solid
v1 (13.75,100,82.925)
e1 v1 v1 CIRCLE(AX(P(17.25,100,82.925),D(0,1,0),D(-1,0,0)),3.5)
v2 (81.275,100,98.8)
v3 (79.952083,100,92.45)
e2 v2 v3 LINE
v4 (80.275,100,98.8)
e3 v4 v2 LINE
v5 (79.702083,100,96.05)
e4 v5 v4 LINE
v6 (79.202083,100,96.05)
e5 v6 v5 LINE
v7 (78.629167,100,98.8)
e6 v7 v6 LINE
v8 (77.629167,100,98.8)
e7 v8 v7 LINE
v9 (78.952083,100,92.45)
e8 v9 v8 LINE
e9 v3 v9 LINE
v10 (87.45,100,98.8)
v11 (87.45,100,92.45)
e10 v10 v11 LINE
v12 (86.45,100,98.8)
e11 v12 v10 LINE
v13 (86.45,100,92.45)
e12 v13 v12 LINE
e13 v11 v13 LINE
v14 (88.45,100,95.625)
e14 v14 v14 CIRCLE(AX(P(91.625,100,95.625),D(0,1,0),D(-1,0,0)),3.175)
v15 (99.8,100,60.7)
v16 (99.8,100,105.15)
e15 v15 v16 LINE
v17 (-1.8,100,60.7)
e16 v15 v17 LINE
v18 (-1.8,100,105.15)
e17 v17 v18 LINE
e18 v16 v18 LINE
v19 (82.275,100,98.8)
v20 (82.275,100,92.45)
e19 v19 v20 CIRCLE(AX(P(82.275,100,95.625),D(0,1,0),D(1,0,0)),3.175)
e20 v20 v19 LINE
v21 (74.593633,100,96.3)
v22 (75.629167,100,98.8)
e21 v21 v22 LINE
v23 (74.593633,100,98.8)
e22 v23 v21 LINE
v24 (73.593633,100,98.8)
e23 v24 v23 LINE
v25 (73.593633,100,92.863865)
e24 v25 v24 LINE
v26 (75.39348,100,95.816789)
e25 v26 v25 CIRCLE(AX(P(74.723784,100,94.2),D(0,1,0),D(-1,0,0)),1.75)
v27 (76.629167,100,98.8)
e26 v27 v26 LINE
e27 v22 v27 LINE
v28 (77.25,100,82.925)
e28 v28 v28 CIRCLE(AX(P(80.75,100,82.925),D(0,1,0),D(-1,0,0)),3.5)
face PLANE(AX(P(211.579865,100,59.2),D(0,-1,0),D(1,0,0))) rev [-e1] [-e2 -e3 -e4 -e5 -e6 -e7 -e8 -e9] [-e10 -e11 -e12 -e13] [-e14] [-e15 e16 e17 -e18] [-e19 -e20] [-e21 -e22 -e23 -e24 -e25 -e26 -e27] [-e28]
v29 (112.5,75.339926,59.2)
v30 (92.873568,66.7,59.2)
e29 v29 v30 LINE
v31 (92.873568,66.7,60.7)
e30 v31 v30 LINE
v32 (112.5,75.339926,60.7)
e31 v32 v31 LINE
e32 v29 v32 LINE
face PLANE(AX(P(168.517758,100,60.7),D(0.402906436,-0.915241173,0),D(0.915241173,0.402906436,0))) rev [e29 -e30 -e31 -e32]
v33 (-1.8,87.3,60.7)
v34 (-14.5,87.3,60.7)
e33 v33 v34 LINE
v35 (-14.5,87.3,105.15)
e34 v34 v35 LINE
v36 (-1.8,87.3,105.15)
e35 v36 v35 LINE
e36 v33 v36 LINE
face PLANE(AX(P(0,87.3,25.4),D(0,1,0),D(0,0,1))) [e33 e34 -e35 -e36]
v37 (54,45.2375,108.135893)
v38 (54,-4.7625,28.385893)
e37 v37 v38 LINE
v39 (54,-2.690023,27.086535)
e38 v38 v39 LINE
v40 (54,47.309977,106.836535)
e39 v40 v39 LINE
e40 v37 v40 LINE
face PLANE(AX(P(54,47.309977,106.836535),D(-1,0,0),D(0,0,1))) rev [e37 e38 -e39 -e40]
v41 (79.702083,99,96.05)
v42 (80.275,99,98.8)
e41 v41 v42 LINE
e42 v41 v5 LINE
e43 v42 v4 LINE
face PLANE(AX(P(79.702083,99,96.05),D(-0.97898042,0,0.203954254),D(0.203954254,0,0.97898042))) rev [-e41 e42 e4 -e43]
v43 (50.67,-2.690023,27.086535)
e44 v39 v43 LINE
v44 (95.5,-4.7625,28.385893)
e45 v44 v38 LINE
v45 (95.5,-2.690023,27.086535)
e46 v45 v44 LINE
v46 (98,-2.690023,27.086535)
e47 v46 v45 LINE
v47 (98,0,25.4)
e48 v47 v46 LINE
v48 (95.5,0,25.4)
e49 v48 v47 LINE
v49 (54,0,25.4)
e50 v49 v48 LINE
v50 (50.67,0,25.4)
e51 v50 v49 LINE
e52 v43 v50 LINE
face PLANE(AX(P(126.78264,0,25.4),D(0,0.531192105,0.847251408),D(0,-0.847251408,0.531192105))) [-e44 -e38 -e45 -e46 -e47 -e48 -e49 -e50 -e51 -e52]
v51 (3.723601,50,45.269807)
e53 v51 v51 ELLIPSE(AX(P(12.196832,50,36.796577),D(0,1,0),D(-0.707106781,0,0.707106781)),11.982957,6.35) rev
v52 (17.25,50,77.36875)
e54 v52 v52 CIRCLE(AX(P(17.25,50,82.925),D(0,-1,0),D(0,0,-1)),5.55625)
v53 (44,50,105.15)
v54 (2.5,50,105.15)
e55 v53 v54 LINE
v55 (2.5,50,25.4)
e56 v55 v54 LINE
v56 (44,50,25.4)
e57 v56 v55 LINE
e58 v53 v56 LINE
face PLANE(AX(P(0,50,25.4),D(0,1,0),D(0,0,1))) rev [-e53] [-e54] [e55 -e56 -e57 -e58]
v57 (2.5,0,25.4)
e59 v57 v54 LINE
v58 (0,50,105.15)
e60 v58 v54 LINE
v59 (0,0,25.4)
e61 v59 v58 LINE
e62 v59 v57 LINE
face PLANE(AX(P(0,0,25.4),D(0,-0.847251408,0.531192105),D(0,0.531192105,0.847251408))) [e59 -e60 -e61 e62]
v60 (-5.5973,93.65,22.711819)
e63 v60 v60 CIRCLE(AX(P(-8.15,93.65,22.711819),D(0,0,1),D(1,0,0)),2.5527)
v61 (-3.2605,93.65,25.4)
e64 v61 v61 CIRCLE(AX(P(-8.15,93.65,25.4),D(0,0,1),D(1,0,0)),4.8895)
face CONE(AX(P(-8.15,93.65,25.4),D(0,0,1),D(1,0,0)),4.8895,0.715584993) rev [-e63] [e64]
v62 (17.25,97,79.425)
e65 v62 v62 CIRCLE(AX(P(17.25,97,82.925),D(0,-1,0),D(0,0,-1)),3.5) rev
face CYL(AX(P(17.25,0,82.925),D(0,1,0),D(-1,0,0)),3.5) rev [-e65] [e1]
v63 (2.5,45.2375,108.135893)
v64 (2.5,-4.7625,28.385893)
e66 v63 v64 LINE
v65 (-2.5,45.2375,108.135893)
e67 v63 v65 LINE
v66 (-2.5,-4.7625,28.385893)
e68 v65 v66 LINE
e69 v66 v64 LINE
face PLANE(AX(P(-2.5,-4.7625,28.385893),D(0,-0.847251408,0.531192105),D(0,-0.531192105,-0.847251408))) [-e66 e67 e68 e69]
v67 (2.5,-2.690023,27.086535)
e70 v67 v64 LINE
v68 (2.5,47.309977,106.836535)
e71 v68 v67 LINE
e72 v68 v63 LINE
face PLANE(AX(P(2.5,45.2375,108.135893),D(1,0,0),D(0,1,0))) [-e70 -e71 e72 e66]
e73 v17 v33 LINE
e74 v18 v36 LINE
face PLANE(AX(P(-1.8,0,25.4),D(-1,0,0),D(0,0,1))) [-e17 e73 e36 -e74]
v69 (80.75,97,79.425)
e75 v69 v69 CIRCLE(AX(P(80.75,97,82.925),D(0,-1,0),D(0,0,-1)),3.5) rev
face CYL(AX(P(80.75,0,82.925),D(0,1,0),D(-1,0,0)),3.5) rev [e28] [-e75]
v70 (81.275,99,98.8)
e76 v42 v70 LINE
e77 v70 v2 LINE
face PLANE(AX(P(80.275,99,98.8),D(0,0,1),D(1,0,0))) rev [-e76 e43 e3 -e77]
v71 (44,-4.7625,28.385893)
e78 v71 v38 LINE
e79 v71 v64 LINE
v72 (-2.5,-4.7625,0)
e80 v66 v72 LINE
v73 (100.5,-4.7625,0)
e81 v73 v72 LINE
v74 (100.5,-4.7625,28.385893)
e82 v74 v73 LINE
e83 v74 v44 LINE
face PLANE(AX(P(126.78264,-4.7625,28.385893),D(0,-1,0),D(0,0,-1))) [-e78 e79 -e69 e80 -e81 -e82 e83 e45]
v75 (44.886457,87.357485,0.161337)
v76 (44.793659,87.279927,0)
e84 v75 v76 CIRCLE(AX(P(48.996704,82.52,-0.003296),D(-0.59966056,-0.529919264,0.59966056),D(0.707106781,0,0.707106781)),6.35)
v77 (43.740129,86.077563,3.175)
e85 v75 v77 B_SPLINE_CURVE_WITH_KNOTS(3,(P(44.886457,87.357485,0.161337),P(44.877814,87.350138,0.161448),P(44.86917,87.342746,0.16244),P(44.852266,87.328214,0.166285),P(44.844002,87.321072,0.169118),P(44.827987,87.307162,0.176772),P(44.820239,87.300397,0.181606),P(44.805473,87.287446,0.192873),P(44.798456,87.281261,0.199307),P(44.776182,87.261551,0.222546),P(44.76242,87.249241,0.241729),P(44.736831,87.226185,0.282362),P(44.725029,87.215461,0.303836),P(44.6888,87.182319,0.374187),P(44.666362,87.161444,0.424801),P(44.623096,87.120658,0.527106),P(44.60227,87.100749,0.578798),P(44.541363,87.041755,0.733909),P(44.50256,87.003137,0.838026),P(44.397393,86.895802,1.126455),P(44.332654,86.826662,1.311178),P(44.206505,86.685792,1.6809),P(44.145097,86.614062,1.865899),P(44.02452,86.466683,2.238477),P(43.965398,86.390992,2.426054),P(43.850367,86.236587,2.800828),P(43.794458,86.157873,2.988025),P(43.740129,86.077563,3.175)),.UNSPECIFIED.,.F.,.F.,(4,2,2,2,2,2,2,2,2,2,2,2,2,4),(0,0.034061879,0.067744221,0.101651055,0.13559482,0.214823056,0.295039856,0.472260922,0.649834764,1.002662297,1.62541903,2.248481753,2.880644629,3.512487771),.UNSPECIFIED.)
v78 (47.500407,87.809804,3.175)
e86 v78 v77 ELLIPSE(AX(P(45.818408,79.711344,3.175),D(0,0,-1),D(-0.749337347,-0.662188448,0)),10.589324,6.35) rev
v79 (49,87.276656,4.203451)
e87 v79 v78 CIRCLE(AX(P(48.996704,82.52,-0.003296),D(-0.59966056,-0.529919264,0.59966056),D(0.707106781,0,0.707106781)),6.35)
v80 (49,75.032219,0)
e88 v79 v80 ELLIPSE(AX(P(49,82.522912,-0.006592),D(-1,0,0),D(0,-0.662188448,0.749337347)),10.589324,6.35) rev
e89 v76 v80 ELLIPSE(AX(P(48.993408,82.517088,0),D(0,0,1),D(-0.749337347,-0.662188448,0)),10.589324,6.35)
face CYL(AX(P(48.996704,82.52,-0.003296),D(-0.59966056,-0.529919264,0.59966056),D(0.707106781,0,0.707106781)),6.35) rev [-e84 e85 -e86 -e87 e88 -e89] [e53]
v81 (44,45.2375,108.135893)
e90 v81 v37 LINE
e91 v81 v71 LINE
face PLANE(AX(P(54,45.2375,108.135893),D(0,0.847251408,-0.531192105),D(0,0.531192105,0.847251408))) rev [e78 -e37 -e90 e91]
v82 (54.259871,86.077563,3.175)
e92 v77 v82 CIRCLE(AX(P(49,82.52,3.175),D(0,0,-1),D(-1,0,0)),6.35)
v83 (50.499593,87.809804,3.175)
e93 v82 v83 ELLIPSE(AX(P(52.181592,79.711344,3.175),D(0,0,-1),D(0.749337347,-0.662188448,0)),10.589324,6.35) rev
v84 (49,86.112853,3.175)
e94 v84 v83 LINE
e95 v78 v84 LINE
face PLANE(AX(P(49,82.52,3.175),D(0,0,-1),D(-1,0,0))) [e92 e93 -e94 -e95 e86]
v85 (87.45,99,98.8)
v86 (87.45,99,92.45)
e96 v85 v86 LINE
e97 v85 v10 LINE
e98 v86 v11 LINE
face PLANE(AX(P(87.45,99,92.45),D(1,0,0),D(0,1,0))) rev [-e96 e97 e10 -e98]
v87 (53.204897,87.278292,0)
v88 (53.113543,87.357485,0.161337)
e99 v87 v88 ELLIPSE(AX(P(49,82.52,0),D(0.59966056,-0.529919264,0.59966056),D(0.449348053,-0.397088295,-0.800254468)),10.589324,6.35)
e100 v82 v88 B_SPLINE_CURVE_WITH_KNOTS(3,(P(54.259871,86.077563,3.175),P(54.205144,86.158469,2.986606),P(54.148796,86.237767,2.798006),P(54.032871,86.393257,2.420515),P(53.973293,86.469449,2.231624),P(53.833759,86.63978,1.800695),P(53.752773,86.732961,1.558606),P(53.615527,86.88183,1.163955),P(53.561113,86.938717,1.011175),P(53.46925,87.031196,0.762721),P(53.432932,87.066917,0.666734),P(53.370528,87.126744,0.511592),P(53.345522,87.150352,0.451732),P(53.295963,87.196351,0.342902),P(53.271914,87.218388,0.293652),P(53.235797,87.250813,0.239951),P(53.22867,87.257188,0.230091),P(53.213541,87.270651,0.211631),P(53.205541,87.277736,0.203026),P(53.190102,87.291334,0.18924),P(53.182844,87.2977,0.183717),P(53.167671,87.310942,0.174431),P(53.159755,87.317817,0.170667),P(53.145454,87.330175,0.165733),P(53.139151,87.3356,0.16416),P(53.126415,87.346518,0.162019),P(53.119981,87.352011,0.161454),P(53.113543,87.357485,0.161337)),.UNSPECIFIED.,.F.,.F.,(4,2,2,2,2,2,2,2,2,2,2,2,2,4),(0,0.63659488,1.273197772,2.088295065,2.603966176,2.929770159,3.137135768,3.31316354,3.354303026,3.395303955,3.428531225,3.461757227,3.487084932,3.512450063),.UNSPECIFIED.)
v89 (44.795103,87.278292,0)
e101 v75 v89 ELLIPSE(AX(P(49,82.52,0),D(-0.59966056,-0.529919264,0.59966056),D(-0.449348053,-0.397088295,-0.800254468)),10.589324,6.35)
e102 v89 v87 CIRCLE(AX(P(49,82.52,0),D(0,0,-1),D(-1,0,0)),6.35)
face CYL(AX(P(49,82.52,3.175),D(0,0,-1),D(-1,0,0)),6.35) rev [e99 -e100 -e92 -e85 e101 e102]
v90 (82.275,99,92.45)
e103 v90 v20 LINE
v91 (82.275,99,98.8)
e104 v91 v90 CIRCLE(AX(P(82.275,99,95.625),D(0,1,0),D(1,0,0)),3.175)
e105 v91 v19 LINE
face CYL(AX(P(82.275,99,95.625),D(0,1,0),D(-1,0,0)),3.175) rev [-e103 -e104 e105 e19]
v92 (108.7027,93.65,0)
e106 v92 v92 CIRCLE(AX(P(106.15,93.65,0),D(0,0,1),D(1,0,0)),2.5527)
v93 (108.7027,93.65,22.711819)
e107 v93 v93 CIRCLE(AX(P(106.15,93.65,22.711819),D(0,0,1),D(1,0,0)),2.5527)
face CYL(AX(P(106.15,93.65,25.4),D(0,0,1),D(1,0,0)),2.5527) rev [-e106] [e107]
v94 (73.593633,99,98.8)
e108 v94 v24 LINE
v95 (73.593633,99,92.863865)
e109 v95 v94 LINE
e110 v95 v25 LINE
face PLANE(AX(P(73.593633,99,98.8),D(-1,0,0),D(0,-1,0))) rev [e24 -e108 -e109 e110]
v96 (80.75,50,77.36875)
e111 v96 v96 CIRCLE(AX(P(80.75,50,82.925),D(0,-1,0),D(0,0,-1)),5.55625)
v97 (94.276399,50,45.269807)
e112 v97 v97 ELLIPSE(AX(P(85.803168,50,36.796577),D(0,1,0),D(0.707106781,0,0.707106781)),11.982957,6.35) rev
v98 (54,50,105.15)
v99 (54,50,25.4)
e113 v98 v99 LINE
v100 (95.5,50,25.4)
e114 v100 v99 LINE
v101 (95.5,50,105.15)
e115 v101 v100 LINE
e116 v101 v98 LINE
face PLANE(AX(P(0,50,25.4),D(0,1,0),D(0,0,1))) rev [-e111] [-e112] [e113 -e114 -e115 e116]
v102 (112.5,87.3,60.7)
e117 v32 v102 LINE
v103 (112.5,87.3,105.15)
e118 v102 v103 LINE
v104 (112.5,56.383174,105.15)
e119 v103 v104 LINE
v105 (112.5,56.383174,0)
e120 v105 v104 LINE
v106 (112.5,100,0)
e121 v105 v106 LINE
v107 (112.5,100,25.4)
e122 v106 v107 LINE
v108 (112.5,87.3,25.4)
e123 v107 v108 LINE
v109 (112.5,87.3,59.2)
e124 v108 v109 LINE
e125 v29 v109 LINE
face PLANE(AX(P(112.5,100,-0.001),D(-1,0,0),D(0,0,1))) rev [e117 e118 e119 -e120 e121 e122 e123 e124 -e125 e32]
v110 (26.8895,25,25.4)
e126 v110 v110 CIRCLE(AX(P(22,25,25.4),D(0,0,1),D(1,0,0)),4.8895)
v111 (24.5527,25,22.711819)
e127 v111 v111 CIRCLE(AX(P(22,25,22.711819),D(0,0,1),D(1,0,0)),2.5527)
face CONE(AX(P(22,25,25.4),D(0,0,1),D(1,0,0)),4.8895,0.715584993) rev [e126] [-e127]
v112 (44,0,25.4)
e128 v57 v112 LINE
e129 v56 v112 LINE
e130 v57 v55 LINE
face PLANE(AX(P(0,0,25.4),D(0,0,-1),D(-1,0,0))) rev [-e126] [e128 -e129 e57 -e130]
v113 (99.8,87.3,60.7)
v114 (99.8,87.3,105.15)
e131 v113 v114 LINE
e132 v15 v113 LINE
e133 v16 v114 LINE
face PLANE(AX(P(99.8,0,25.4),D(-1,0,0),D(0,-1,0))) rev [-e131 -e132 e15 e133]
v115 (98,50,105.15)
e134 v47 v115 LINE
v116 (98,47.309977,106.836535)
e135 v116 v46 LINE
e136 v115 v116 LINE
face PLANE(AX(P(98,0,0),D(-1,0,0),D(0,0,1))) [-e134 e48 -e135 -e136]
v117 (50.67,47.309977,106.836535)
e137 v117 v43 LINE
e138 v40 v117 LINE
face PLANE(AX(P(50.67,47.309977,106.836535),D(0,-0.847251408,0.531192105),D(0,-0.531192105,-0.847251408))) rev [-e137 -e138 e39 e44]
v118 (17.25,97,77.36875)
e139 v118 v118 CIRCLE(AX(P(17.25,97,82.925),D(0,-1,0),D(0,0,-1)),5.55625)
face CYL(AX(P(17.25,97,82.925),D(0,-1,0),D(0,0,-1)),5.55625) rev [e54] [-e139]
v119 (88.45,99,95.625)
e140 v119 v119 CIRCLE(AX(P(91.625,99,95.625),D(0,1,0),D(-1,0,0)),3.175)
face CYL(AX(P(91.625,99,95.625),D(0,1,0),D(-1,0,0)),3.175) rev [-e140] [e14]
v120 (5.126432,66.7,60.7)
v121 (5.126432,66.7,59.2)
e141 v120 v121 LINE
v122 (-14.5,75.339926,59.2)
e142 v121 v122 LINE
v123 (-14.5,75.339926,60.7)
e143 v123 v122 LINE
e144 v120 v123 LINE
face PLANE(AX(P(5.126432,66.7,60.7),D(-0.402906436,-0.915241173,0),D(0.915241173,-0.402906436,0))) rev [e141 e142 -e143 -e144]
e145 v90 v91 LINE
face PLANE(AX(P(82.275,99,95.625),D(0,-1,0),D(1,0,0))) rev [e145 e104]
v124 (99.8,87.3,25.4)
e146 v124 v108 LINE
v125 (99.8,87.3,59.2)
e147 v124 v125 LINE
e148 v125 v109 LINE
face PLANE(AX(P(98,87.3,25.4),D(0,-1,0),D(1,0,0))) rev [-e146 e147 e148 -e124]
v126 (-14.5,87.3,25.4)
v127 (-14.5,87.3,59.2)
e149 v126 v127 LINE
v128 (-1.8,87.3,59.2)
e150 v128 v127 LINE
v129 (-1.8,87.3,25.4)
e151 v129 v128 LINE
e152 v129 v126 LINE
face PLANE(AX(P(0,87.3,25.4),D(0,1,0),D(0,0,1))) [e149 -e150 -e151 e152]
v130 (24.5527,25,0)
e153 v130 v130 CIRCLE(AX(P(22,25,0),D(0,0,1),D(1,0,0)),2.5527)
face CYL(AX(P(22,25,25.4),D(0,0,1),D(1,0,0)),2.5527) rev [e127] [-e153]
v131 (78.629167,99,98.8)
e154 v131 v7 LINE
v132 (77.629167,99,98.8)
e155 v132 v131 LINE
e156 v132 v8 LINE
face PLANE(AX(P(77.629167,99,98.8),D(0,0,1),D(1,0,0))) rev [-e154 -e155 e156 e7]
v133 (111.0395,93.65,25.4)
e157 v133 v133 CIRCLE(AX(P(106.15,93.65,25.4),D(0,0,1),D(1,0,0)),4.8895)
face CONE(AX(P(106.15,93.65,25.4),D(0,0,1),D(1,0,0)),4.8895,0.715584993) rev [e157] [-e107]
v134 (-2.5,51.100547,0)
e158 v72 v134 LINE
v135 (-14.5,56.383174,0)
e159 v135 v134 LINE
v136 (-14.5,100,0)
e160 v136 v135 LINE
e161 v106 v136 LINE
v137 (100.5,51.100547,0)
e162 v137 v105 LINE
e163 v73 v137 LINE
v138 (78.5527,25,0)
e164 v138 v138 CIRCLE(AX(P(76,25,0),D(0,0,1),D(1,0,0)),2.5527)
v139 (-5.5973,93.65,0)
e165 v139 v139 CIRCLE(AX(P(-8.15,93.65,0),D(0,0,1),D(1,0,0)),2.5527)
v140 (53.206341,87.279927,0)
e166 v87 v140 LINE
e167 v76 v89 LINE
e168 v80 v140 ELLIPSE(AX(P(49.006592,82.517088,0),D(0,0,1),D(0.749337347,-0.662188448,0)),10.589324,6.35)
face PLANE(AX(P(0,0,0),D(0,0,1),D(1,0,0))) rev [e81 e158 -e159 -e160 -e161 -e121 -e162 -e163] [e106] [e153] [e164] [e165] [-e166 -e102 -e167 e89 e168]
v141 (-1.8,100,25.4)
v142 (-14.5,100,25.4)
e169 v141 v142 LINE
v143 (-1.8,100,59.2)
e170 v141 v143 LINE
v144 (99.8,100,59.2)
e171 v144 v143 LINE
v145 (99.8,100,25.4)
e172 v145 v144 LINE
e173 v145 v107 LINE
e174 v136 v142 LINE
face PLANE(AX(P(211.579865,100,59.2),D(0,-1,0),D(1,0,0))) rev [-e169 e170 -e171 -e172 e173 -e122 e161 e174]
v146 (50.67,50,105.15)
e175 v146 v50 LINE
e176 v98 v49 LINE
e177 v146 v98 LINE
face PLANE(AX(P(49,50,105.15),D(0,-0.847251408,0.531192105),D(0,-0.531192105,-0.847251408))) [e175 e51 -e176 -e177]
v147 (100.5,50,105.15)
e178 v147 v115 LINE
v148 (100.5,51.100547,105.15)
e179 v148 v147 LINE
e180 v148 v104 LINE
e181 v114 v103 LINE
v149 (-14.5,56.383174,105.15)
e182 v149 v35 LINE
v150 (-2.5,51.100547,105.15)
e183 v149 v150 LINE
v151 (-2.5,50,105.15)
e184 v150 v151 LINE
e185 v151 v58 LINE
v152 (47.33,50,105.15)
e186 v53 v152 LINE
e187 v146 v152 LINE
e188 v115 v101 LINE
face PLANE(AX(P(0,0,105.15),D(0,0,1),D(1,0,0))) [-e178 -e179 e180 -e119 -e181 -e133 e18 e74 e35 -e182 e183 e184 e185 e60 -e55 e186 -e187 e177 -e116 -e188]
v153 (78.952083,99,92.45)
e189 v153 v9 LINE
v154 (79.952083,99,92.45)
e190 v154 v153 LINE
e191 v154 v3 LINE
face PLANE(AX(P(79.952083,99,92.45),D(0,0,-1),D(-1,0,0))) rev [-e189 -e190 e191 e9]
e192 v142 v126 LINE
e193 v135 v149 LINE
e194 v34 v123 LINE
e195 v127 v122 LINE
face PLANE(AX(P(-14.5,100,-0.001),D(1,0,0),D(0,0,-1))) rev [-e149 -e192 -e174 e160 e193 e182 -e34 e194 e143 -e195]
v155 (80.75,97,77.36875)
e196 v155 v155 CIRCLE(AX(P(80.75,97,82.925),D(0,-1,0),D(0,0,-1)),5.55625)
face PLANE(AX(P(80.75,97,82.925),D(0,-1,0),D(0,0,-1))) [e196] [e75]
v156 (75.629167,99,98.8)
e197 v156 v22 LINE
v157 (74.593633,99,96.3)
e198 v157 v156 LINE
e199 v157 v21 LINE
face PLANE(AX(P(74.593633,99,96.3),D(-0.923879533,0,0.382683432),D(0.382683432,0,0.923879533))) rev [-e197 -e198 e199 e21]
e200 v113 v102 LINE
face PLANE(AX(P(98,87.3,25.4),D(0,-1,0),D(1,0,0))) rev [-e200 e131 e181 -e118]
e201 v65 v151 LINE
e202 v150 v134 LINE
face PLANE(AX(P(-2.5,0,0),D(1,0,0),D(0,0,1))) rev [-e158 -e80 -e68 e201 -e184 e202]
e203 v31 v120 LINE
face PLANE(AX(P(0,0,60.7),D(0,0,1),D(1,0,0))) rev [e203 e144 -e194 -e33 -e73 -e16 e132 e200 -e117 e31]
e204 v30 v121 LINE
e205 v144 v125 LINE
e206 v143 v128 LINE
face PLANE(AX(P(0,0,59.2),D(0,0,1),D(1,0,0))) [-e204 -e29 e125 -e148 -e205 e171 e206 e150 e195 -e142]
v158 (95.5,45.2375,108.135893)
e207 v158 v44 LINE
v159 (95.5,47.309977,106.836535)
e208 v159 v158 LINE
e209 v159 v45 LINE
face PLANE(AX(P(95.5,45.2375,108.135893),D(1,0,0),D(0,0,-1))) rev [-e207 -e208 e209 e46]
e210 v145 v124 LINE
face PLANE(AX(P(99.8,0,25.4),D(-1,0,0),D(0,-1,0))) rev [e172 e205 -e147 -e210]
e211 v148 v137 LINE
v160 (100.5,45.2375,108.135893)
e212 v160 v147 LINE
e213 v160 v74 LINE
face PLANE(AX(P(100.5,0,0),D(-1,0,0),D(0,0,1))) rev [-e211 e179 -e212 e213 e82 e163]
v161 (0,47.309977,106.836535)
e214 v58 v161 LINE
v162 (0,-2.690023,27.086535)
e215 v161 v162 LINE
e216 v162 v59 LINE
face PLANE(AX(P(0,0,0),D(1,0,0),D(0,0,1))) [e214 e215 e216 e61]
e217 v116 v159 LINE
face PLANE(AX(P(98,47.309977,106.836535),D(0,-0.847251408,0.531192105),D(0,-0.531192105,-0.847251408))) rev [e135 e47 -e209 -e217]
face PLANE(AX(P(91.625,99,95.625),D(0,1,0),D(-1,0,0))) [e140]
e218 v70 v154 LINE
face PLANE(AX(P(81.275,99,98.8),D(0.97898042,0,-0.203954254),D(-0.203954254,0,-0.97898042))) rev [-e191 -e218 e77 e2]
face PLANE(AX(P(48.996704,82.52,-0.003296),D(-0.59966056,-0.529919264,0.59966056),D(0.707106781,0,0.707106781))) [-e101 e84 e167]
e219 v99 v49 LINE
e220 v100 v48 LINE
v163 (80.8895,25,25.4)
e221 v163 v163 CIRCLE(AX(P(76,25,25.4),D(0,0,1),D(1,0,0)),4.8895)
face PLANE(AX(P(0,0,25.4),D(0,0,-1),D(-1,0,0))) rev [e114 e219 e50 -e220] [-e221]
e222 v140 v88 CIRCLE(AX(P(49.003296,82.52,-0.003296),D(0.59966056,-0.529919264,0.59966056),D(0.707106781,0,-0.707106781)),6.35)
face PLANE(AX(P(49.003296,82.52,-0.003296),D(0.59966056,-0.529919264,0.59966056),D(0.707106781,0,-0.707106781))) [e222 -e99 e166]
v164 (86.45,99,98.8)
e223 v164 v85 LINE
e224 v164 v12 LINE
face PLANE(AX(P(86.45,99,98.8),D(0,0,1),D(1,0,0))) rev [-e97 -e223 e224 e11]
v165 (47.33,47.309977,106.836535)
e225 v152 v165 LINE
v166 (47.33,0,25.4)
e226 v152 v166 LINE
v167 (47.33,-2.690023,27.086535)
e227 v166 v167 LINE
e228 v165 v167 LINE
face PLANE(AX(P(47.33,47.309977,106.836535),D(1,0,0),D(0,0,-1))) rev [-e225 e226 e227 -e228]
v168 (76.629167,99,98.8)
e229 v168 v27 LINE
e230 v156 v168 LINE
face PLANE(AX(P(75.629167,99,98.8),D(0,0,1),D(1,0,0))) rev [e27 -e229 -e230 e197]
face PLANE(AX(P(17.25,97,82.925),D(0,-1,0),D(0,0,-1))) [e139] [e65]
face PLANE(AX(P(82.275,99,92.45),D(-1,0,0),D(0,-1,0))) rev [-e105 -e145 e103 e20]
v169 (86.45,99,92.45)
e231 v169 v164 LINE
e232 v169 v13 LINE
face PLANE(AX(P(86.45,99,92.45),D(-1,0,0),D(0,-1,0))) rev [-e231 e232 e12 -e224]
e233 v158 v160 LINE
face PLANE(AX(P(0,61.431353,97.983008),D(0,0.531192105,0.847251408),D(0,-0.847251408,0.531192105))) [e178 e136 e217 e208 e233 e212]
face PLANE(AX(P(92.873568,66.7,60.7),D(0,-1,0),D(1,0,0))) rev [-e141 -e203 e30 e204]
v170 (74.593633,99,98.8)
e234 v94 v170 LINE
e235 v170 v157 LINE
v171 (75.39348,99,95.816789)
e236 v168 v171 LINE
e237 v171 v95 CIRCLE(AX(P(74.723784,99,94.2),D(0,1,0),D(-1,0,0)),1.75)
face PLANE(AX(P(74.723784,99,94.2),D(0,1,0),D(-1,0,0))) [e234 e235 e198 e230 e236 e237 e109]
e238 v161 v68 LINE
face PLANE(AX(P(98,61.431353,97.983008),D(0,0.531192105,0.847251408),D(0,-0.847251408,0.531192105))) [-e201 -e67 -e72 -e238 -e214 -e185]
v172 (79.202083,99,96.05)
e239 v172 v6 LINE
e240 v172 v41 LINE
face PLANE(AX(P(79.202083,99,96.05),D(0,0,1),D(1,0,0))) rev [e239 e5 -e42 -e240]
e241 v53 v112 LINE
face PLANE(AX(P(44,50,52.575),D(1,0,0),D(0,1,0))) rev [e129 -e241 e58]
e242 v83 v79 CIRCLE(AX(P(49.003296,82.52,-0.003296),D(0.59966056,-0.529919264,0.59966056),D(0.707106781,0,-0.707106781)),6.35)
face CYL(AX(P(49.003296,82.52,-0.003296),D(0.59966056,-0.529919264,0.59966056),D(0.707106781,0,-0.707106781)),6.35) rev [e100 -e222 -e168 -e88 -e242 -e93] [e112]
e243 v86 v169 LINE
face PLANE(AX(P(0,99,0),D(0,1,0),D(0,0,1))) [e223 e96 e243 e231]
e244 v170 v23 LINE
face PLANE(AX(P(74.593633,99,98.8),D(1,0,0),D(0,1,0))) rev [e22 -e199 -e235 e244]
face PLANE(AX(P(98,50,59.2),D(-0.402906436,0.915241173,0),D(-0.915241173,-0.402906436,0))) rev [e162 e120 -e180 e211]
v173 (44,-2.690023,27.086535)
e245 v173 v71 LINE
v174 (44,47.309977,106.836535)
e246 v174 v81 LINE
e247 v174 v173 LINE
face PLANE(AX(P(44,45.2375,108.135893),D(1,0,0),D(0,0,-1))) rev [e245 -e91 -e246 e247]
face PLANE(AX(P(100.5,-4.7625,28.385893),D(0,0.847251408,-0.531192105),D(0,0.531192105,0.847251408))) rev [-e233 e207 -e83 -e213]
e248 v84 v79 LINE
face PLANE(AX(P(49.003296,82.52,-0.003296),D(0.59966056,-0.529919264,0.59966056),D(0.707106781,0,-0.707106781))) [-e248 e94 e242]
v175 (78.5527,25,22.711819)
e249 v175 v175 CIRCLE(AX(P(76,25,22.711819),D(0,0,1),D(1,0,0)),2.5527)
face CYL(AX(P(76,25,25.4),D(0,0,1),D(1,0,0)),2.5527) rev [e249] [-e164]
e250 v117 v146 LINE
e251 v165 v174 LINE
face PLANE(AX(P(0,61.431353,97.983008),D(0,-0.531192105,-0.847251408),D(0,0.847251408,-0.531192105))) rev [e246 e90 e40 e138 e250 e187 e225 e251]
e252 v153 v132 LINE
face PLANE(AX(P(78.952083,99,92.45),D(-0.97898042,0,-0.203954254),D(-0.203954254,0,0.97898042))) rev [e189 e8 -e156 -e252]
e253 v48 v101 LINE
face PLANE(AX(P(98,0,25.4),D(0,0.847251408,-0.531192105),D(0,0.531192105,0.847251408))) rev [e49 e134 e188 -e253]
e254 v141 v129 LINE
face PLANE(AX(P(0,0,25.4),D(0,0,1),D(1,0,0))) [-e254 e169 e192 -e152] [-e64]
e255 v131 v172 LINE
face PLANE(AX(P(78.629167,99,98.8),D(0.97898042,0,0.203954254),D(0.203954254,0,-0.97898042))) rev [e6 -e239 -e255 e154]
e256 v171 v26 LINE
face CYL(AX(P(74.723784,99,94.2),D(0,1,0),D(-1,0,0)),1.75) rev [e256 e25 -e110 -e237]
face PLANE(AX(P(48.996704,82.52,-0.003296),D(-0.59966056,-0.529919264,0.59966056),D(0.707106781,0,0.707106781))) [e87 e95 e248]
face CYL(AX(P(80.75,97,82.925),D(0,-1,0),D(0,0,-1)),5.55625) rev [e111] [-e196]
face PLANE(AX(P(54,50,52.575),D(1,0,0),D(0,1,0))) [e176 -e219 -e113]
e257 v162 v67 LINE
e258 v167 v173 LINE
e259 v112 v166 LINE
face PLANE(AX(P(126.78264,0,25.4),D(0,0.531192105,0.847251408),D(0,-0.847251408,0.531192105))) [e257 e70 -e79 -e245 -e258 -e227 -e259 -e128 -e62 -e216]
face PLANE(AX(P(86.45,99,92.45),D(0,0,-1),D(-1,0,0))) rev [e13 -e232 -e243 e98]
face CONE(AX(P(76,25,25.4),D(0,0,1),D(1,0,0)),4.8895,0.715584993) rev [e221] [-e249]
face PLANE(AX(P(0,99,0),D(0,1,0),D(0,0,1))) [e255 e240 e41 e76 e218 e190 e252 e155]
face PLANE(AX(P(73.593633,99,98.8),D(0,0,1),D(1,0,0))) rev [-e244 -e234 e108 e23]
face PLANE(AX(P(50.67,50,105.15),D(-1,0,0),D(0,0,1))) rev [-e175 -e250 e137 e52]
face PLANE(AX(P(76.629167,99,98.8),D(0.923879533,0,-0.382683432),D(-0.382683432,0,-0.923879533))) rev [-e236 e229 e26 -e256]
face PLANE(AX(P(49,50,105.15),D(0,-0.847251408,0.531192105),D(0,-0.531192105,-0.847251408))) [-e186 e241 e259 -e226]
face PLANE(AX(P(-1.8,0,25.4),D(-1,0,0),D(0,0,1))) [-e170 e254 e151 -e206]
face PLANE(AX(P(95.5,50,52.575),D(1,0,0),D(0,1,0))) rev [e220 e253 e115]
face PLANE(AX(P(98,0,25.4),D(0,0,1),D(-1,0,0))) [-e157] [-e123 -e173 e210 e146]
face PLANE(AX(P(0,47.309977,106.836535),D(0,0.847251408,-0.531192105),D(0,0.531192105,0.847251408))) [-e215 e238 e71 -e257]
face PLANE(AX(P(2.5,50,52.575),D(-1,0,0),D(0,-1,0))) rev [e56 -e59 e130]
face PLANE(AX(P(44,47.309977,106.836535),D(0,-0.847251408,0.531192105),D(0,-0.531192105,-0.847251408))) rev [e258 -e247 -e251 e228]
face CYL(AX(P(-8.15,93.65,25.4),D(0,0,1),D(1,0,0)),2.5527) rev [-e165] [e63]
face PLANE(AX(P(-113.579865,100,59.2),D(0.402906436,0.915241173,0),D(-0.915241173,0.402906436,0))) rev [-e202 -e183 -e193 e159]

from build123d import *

# Parameters (mm, degrees)
BOSS_EXTRU_1_DEPTH                                = 59.2
BOSS_EXTRU_2_DEPTH                                = 1.5
BOSS_EXTRU_3_DEPTH                                = 44.45
ESQUISSE5_W                                       = 98
ESQUISSE5_H                                       = 50
ENL_V_MAT_EXTRU_1_DEPTH                           = 79.75
NERVURE3_REACH                                    = 219.919
ESQUISSE7_WALL_W                                  = 531.966109146
ESQUISSE7_WALL_H                                  = 10
ESQUISSE8_W                                       = 12.7
ESQUISSE8_H                                       = 12.7
ENL_V_MAT_EXTRU_2_DEPTH                           = 79.75
FRAISAGE_POUR_VIS_T_TE_FRAIS_E_BOMB_E_D           = 5.1054
FRAISAGE_POUR_VIS_T_TE_FRAIS_E_BOMB_E_CSINK_D     = 9.779
FRAISAGE_POUR_VIS_T_TE_FRAIS_E_BOMB_E_CSINK_ANGLE = 82
ENL_VEMENT_START                                  = 1.582341914
ENL_VEMENT_DE_MATI_RE_BALAYAGE2_OUTLINE_R         = 6.35
ENL_VEMENT_DE_MATI_RE_BALAYAGE2_DEPTH             = 71.529963189
ENL_VEMENT_START_2                                = -14.345570266
ENL_VEMENT_DE_MATI_RE_BALAYAGE3_OUTLINE_R         = 6.35
ENL_VEMENT_DE_MATI_RE_BALAYAGE3_DEPTH             = 71.529963189
ESQUISSE26_R                                      = 6.35
ENL_V_MAT_EXTRU_4_DEPTH                           = 3.175
NERVURE4_REACH                                    = 258.559
ESQUISSE27_WALL_W                                 = 609.246066174
ESQUISSE27_WALL_H                                 = 2.5
ESQUISSE29_R                                      = 3.5
ENL_V_MAT_EXTRU_7_DEPTH                           = 257.559080586
ESQUISSE28_R                                      = 5.55625
ENL_V_MAT_EXTRU_6_DEPTH                           = 47
ESQUISSE30_R                                      = 3.175
LETTRE_O_DEPTH                                    = 1
ESQUISSE31_W                                      = 1
ESQUISSE31_H                                      = 6.35
LETTRE_I_DEPTH                                    = 1
LETTRE_D_DEPTH                                    = 1
LETTRE_A_DEPTH                                    = 1
LETTRE_R_DEPTH                                    = 1
BOSS_EXTRU_5_REACH                                = 258.559
BOSS_EXTRU_6_DEPTH                                = 94.127905
BOSS_EXTRU_7_DEPTH                                = 2.5
ESQUISSE38_W                                      = 2.5
ESQUISSE38_H                                      = 2.446117838
BOSS_EXTRU_8_DEPTH                                = 94.127905
ENL_V_MAT_EXTRU_13_REACH                          = 263.075
BOSS_EXTRU_9_REACH                                = 245.841
ESQUISSE40_W                                      = 2.5
ESQUISSE40_H                                      = 105.15
ENL_V_MAT_EXTRU_14_REACH                          = 258.559


# Read off the part's stored shape, not the designer's step: Enlèvement de matière-Balayage2, Enlèvement de matière-Balayage3
with BuildPart() as part:
    # Esquisse2 → Boss.-Extru.1 (new body)
    with BuildSketch(Plane.XY):
        Polygon((0, 0), (98, 0), (98, 50), (211.579865137, 100), (-113.579865137, 100), (0, 50), align=None)
    extrude(amount=BOSS_EXTRU_1_DEPTH)

    # Esquisse3 → Boss.-Extru.2 (add)
    with BuildSketch(Plane.XY.offset(59.2)):
        Polygon((0, 0), (98, 0), (98, 50), (211.579865137, 100), (168.51775825, 100), (92.873568069, 66.7), (5.126431931, 66.7), (-70.51775825, 100), (-113.579865137, 100), (0, 50), align=None)
    extrude(amount=BOSS_EXTRU_2_DEPTH)

    # Esquisse4 → Boss.-Extru.3 (add)
    with BuildSketch(Plane.XY.offset(60.7)):
        Polygon((0, 0), (98, 0), (98, 50), (211.579865137, 100), (-113.579865137, 100), (0, 50), align=None)
    extrude(amount=BOSS_EXTRU_3_DEPTH)

    # Esquisse5 → Enlèv. mat.-Extru.1 (cut)
    with BuildSketch(Plane.XY.offset(105.15)):
        with Locations((49, 25)):
            Rectangle(ESQUISSE5_W, ESQUISSE5_H)
    extrude(amount=-ENL_V_MAT_EXTRU_1_DEPTH, mode=Mode.SUBTRACT)

    # Esquisse7 wall → Nervure3 (add, up to next)
    with BuildSketch(Plane(origin=(49, 25, 65.275), x_dir=(0, -0.531192105031, -0.847251407525), z_dir=(0, 0.847251407525, -0.531192105031)), mode=Mode.PRIVATE) as nervure3_sk1:
        Rectangle(ESQUISSE7_WALL_W, ESQUISSE7_WALL_H)
    nervure3_tool1 = extrude(nervure3_sk1.sketch, amount=NERVURE3_REACH, mode=Mode.PRIVATE) - part.part
    add(nervure3_tool1.solids().sort_by_distance((49, 25, 65.275))[0])

    # Esquisse8 → Enlèv. mat.-Extru.2 (cut)
    with BuildSketch(Plane.XY.offset(105.15)):
        with Locations((-8.15, 93.65)):
            Rectangle(ESQUISSE8_W, ESQUISSE8_H)
    enl_v_mat_extru_2 = extrude(amount=-ENL_V_MAT_EXTRU_2_DEPTH, mode=Mode.SUBTRACT)

    # Symétrie1: Enlèv. mat.-Extru.2 across plane
    add(enl_v_mat_extru_2.mirror(Plane(origin=(49, 0, 0), x_dir=(0, 0, 1), z_dir=(1, 0, 0))), mode=Mode.SUBTRACT)

    # Fraisage pour vis à tête fraisée bombée #101 (through all)
    with Locations(Plane.XY.offset(25.4)):
        with Locations((22, 25), (76, 25), (106.15, 93.65), (-8.15, 93.65)):
            CounterSinkHole(FRAISAGE_POUR_VIS_T_TE_FRAIS_E_BOMB_E_D / 2, FRAISAGE_POUR_VIS_T_TE_FRAIS_E_BOMB_E_CSINK_D / 2, counter_sink_angle=FRAISAGE_POUR_VIS_T_TE_FRAIS_E_BOMB_E_CSINK_ANGLE)

    # Enlèvement de matière-Balayage2 outline → Enlèvement de matière-Balayage2 (cut)
    with BuildSketch(Plane(origin=(0, 0, 0), x_dir=(0.8002544678430299, -0.3970882953901229, 0.44934805258444765), z_dir=(0.5996605595645498, 0.5299192642332058, -0.5996605595645498)).offset(ENL_VEMENT_START)):
        with Locations((6.44062437, -61.833135415)):
            Circle(ENL_VEMENT_DE_MATI_RE_BALAYAGE2_OUTLINE_R)
    extrude(amount=ENL_VEMENT_DE_MATI_RE_BALAYAGE2_DEPTH, mode=Mode.SUBTRACT)

    # Enlèvement de matière-Balayage3 outline → Enlèvement de matière-Balayage3 (cut)
    with BuildSketch(Plane(origin=(0, 0, 0), x_dir=(0.8002544678430281, 0.39708829539012125, -0.4493480525844523), z_dir=(0.5996605595645522, -0.5299192642332002, 0.5996605595645522)).offset(ENL_VEMENT_START_2)):
        with Locations((71.984313478, 61.833135415)):
            Circle(ENL_VEMENT_DE_MATI_RE_BALAYAGE3_OUTLINE_R)
    extrude(amount=ENL_VEMENT_DE_MATI_RE_BALAYAGE3_DEPTH, mode=Mode.SUBTRACT)

    # Esquisse26 → Enlèv. mat.-Extru.4 (cut)
    with BuildSketch(Plane(origin=(0, 0, 0), x_dir=(-1, 0, 0), z_dir=(0, 0, -1))):
        with Locations((-49, 82.52)):
            Circle(ESQUISSE26_R)
    extrude(amount=-ENL_V_MAT_EXTRU_4_DEPTH, mode=Mode.SUBTRACT)

    # Esquisse27 wall → Nervure4 (add, up to next)
    with BuildSketch(Plane(origin=(0, 25, 65.275), x_dir=(0, 0.531192105031, 0.847251407525), z_dir=(0, 0.847251407525, -0.531192105031)), mode=Mode.PRIVATE) as nervure4_sk1:
        with Locations((0, 1.25)):
            Rectangle(ESQUISSE27_WALL_W, ESQUISSE27_WALL_H)
    nervure4_tool1 = extrude(nervure4_sk1.sketch, amount=NERVURE4_REACH, mode=Mode.PRIVATE) - part.part
    nervure4 = nervure4_tool1.solids().sort_by_distance((0, 25, 65.275))[0]
    add(nervure4)

    # Symétrie5: Nervure4 across plane
    add(nervure4.mirror(Plane.ZY.offset(-49)))

    # Esquisse29 → Enlèv. mat.-Extru.7 (cut, through all)
    with BuildSketch(Plane(origin=(0, 100, 0), x_dir=(1, 0, 0), z_dir=(0, 1, 0))):
        with Locations(Location((80.75, -82.925, 0), (0, 0, 180))):
            Circle(ESQUISSE29_R)
        with Locations(Location((17.25, -82.925, 0), (0, 0, 180))):
            Circle(ESQUISSE29_R)
    extrude(amount=-ENL_V_MAT_EXTRU_7_DEPTH, mode=Mode.SUBTRACT)

    # Esquisse28 → Enlèv. mat.-Extru.6 (cut)
    with BuildSketch(Plane.XZ.offset(-50)):
        with Locations(Location((17.25, 82.925, 0), (0, 0, 270))):
            Circle(ESQUISSE28_R)
        with Locations(Location((80.75, 82.925, 0), (0, 0, 270))):
            Circle(ESQUISSE28_R)
    extrude(amount=-ENL_V_MAT_EXTRU_6_DEPTH, mode=Mode.SUBTRACT)

    # Esquisse30 → Lettre_O (cut)
    with BuildSketch(Plane(origin=(0, 100, 0), x_dir=(1, 0, 0), z_dir=(0, 1, 0))):
        with Locations(Location((91.625, -95.625, 0), (0, 0, 180))):
            Circle(ESQUISSE30_R)
    extrude(amount=-LETTRE_O_DEPTH, mode=Mode.SUBTRACT)

    # Esquisse31 → Lettre_I (cut)
    with BuildSketch(Plane(origin=(0, 100, 0), x_dir=(1, 0, 0), z_dir=(0, 1, 0))):
        with Locations((86.95, -95.625)):
            Rectangle(ESQUISSE31_W, ESQUISSE31_H)
    extrude(amount=-LETTRE_I_DEPTH, mode=Mode.SUBTRACT)

    # Esquisse32 → Lettre_D (cut)
    with BuildSketch(Plane(origin=(0, 100, 0), x_dir=(1, 0, 0), z_dir=(0, 1, 0))):
        with BuildLine():
            Line((82.275, -92.45), (82.275, -98.8))
            ThreePointArc((82.275, -98.8), (85.45, -95.625), (82.275, -92.45))
        make_face()
    extrude(amount=-LETTRE_D_DEPTH, mode=Mode.SUBTRACT)

    # Esquisse33 → Lettre_A (cut)
    with BuildSketch(Plane(origin=(0, 100, 0), x_dir=(1, 0, 0), z_dir=(0, 1, 0))):
        Polygon((77.629166667, -98.8), (78.629166667, -98.8), (79.202083333, -96.05), (79.702083333, -96.05), (80.275, -98.8), (81.275, -98.8), (79.952083333, -92.45), (78.952083333, -92.45), align=None)
    extrude(amount=-LETTRE_A_DEPTH, mode=Mode.SUBTRACT)

    # Esquisse34 → Lettre_R (cut)
    with BuildSketch(Plane(origin=(0, 100, 0), x_dir=(1, 0, 0), z_dir=(0, 1, 0))):
        with BuildLine():
            Line((73.593632761, -98.8), (73.593632761, -92.863864698))
            ThreePointArc((73.593632761, -92.863864698), (76.218088657, -93.289201214), (75.393480286, -95.816789182))
            Line((75.393480286, -95.816789182), (76.629166667, -98.8))
            Line((76.629166667, -98.8), (75.629166667, -98.8))
            Line((75.629166667, -98.8), (74.593632761, -96.3))
            Line((74.593632761, -96.3), (74.593632761, -98.8))
            Line((74.593632761, -98.8), (73.593632761, -98.8))
        make_face()
    extrude(amount=-LETTRE_R_DEPTH, mode=Mode.SUBTRACT)

    # Boss.-Extru.5: up to this face of the body (flat: up to its plane)
    boss_extru_5_end = Plane(part.part.faces().sort_by_distance((98, 30.090642155, 36.697287119))[0])
    # Esquisse35 → Boss.-Extru.5 (add, up to the picked face)
    with BuildSketch(Plane.ZY, mode=Mode.PRIVATE) as boss_extru_5_sk1:
        Polygon((25.4, 0), (28.385893417, -4.7625), (0, -4.7625), (0, 0), align=None)
    boss_extru_5_tool1 = split(extrude(boss_extru_5_sk1.sketch, amount=-BOSS_EXTRU_5_REACH, mode=Mode.PRIVATE), bisect_by=boss_extru_5_end, keep=Keep.BOTH, mode=Mode.PRIVATE)
    add(boss_extru_5_tool1.solids().sort_by(Axis((0, -2.425315, 13.460287), (1, 0, 0)))[0])

    # Esquisse36 → Boss.-Extru.6 (add)
    with BuildSketch(Plane(origin=(0, 11.43135277, 18.233007668), x_dir=(1, 0, 0), z_dir=(0, 0.5311921050311518, 0.8472514075246933))):
        Polygon((50.67, -13.492279468), (50.67, -16.667279468), (54, -16.667279468), (54, -19.113397306), (44, -19.113397306), (44, -16.667279468), (47.33, -16.667279468), (47.33, -13.492279468), align=None)
    extrude(amount=BOSS_EXTRU_6_DEPTH)

    # Esquisse37 → Boss.-Extru.7 (add)
    with BuildSketch(Plane(origin=(98, 0, 0), x_dir=(0, 0, -1), z_dir=(1, 0, 0))):
        Polygon((0, 50), (0, -4.7625), (-28.385893417, -4.7625), (-115.732080917, 50), align=None)
    boss_extru_7 = extrude(amount=BOSS_EXTRU_7_DEPTH)

    # Esquisse38 → Boss.-Extru.8 (add)
    with BuildSketch(Plane(origin=(0, 11.43135277, 18.233007668), x_dir=(1, 0, 0), z_dir=(0, 0.5311921050311518, 0.8472514075246933))):
        with Locations((96.75, -17.890338387)):
            Rectangle(ESQUISSE38_W, ESQUISSE38_H)
    boss_extru_8 = extrude(amount=BOSS_EXTRU_8_DEPTH)

    # Esquisse39 → Enlèv. mat.-Extru.13 (cut, up to next)
    with BuildSketch(Plane.ZY.offset(-98), mode=Mode.PRIVATE) as enl_v_mat_extru_13_sk1:
        Polygon((108.135893417, 45.2375), (105.15, 50), (115.732080917, 50), align=None)
    enl_v_mat_extru_13_tool1 = extrude(enl_v_mat_extru_13_sk1.sketch, amount=-ENL_V_MAT_EXTRU_13_REACH, mode=Mode.PRIVATE) & part.part
    enl_v_mat_extru_13 = enl_v_mat_extru_13_tool1.solids().sort_by_distance((98, 48.4125, 109.672658))[0]
    add(enl_v_mat_extru_13, mode=Mode.SUBTRACT)

    # Esquisse40 → Boss.-Extru.9 (add, up to next)
    with BuildSketch(Plane(origin=(0, 50, 0), x_dir=(1, 0, 0), z_dir=(0, 1, 0)), mode=Mode.PRIVATE) as boss_extru_9_sk1:
        with Locations((99.25, -52.575)):
            Rectangle(ESQUISSE40_W, ESQUISSE40_H)
    boss_extru_9_tool1 = extrude(boss_extru_9_sk1.sketch, amount=BOSS_EXTRU_9_REACH, mode=Mode.PRIVATE) - part.part
    boss_extru_9 = boss_extru_9_tool1.solids().sort_by_distance((99.25, 50, 52.575))[0]
    add(boss_extru_9)

    # Symétrie6: Boss.-Extru.7, Boss.-Extru.8, Enlèv. mat.-Extru.13, Boss.-Extru.9 across plane
    add(boss_extru_7.mirror(Plane.ZY.offset(-49)))
    add(boss_extru_8.mirror(Plane.ZY.offset(-49)))
    add(enl_v_mat_extru_13.mirror(Plane.ZY.offset(-49)), mode=Mode.SUBTRACT)
    add(boss_extru_9.mirror(Plane.ZY.offset(-49)))

    # Esquisse41 → Enlèv. mat.-Extru.14 (cut, up to next)
    with BuildSketch(Plane.XY.offset(105.15), mode=Mode.PRIVATE) as enl_v_mat_extru_14_sk1:
        Polygon((112.5, 100), (112.5, 56.38317363), (211.579865137, 100), align=None)
    enl_v_mat_extru_14_tool1 = extrude(enl_v_mat_extru_14_sk1.sketch, amount=-ENL_V_MAT_EXTRU_14_REACH, mode=Mode.PRIVATE) & part.part
    # Esquisse41 → Enlèv. mat.-Extru.14 (cut, up to next)
    with BuildSketch(Plane.XY.offset(105.15), mode=Mode.PRIVATE) as enl_v_mat_extru_14_sk2:
        Polygon((-14.5, 100), (-14.5, 56.38317363), (-113.579865137, 100), align=None)
    enl_v_mat_extru_14_tool2 = extrude(enl_v_mat_extru_14_sk2.sketch, amount=-ENL_V_MAT_EXTRU_14_REACH, mode=Mode.PRIVATE) & part.part
    add(enl_v_mat_extru_14_tool1.solids().sort_by_distance((145.526622, 85.461058, 105.15))[0], mode=Mode.SUBTRACT)
    add(enl_v_mat_extru_14_tool2.solids().sort_by_distance((-47.526622, 85.461058, 105.15))[0], mode=Mode.SUBTRACT)


solid = part.part
